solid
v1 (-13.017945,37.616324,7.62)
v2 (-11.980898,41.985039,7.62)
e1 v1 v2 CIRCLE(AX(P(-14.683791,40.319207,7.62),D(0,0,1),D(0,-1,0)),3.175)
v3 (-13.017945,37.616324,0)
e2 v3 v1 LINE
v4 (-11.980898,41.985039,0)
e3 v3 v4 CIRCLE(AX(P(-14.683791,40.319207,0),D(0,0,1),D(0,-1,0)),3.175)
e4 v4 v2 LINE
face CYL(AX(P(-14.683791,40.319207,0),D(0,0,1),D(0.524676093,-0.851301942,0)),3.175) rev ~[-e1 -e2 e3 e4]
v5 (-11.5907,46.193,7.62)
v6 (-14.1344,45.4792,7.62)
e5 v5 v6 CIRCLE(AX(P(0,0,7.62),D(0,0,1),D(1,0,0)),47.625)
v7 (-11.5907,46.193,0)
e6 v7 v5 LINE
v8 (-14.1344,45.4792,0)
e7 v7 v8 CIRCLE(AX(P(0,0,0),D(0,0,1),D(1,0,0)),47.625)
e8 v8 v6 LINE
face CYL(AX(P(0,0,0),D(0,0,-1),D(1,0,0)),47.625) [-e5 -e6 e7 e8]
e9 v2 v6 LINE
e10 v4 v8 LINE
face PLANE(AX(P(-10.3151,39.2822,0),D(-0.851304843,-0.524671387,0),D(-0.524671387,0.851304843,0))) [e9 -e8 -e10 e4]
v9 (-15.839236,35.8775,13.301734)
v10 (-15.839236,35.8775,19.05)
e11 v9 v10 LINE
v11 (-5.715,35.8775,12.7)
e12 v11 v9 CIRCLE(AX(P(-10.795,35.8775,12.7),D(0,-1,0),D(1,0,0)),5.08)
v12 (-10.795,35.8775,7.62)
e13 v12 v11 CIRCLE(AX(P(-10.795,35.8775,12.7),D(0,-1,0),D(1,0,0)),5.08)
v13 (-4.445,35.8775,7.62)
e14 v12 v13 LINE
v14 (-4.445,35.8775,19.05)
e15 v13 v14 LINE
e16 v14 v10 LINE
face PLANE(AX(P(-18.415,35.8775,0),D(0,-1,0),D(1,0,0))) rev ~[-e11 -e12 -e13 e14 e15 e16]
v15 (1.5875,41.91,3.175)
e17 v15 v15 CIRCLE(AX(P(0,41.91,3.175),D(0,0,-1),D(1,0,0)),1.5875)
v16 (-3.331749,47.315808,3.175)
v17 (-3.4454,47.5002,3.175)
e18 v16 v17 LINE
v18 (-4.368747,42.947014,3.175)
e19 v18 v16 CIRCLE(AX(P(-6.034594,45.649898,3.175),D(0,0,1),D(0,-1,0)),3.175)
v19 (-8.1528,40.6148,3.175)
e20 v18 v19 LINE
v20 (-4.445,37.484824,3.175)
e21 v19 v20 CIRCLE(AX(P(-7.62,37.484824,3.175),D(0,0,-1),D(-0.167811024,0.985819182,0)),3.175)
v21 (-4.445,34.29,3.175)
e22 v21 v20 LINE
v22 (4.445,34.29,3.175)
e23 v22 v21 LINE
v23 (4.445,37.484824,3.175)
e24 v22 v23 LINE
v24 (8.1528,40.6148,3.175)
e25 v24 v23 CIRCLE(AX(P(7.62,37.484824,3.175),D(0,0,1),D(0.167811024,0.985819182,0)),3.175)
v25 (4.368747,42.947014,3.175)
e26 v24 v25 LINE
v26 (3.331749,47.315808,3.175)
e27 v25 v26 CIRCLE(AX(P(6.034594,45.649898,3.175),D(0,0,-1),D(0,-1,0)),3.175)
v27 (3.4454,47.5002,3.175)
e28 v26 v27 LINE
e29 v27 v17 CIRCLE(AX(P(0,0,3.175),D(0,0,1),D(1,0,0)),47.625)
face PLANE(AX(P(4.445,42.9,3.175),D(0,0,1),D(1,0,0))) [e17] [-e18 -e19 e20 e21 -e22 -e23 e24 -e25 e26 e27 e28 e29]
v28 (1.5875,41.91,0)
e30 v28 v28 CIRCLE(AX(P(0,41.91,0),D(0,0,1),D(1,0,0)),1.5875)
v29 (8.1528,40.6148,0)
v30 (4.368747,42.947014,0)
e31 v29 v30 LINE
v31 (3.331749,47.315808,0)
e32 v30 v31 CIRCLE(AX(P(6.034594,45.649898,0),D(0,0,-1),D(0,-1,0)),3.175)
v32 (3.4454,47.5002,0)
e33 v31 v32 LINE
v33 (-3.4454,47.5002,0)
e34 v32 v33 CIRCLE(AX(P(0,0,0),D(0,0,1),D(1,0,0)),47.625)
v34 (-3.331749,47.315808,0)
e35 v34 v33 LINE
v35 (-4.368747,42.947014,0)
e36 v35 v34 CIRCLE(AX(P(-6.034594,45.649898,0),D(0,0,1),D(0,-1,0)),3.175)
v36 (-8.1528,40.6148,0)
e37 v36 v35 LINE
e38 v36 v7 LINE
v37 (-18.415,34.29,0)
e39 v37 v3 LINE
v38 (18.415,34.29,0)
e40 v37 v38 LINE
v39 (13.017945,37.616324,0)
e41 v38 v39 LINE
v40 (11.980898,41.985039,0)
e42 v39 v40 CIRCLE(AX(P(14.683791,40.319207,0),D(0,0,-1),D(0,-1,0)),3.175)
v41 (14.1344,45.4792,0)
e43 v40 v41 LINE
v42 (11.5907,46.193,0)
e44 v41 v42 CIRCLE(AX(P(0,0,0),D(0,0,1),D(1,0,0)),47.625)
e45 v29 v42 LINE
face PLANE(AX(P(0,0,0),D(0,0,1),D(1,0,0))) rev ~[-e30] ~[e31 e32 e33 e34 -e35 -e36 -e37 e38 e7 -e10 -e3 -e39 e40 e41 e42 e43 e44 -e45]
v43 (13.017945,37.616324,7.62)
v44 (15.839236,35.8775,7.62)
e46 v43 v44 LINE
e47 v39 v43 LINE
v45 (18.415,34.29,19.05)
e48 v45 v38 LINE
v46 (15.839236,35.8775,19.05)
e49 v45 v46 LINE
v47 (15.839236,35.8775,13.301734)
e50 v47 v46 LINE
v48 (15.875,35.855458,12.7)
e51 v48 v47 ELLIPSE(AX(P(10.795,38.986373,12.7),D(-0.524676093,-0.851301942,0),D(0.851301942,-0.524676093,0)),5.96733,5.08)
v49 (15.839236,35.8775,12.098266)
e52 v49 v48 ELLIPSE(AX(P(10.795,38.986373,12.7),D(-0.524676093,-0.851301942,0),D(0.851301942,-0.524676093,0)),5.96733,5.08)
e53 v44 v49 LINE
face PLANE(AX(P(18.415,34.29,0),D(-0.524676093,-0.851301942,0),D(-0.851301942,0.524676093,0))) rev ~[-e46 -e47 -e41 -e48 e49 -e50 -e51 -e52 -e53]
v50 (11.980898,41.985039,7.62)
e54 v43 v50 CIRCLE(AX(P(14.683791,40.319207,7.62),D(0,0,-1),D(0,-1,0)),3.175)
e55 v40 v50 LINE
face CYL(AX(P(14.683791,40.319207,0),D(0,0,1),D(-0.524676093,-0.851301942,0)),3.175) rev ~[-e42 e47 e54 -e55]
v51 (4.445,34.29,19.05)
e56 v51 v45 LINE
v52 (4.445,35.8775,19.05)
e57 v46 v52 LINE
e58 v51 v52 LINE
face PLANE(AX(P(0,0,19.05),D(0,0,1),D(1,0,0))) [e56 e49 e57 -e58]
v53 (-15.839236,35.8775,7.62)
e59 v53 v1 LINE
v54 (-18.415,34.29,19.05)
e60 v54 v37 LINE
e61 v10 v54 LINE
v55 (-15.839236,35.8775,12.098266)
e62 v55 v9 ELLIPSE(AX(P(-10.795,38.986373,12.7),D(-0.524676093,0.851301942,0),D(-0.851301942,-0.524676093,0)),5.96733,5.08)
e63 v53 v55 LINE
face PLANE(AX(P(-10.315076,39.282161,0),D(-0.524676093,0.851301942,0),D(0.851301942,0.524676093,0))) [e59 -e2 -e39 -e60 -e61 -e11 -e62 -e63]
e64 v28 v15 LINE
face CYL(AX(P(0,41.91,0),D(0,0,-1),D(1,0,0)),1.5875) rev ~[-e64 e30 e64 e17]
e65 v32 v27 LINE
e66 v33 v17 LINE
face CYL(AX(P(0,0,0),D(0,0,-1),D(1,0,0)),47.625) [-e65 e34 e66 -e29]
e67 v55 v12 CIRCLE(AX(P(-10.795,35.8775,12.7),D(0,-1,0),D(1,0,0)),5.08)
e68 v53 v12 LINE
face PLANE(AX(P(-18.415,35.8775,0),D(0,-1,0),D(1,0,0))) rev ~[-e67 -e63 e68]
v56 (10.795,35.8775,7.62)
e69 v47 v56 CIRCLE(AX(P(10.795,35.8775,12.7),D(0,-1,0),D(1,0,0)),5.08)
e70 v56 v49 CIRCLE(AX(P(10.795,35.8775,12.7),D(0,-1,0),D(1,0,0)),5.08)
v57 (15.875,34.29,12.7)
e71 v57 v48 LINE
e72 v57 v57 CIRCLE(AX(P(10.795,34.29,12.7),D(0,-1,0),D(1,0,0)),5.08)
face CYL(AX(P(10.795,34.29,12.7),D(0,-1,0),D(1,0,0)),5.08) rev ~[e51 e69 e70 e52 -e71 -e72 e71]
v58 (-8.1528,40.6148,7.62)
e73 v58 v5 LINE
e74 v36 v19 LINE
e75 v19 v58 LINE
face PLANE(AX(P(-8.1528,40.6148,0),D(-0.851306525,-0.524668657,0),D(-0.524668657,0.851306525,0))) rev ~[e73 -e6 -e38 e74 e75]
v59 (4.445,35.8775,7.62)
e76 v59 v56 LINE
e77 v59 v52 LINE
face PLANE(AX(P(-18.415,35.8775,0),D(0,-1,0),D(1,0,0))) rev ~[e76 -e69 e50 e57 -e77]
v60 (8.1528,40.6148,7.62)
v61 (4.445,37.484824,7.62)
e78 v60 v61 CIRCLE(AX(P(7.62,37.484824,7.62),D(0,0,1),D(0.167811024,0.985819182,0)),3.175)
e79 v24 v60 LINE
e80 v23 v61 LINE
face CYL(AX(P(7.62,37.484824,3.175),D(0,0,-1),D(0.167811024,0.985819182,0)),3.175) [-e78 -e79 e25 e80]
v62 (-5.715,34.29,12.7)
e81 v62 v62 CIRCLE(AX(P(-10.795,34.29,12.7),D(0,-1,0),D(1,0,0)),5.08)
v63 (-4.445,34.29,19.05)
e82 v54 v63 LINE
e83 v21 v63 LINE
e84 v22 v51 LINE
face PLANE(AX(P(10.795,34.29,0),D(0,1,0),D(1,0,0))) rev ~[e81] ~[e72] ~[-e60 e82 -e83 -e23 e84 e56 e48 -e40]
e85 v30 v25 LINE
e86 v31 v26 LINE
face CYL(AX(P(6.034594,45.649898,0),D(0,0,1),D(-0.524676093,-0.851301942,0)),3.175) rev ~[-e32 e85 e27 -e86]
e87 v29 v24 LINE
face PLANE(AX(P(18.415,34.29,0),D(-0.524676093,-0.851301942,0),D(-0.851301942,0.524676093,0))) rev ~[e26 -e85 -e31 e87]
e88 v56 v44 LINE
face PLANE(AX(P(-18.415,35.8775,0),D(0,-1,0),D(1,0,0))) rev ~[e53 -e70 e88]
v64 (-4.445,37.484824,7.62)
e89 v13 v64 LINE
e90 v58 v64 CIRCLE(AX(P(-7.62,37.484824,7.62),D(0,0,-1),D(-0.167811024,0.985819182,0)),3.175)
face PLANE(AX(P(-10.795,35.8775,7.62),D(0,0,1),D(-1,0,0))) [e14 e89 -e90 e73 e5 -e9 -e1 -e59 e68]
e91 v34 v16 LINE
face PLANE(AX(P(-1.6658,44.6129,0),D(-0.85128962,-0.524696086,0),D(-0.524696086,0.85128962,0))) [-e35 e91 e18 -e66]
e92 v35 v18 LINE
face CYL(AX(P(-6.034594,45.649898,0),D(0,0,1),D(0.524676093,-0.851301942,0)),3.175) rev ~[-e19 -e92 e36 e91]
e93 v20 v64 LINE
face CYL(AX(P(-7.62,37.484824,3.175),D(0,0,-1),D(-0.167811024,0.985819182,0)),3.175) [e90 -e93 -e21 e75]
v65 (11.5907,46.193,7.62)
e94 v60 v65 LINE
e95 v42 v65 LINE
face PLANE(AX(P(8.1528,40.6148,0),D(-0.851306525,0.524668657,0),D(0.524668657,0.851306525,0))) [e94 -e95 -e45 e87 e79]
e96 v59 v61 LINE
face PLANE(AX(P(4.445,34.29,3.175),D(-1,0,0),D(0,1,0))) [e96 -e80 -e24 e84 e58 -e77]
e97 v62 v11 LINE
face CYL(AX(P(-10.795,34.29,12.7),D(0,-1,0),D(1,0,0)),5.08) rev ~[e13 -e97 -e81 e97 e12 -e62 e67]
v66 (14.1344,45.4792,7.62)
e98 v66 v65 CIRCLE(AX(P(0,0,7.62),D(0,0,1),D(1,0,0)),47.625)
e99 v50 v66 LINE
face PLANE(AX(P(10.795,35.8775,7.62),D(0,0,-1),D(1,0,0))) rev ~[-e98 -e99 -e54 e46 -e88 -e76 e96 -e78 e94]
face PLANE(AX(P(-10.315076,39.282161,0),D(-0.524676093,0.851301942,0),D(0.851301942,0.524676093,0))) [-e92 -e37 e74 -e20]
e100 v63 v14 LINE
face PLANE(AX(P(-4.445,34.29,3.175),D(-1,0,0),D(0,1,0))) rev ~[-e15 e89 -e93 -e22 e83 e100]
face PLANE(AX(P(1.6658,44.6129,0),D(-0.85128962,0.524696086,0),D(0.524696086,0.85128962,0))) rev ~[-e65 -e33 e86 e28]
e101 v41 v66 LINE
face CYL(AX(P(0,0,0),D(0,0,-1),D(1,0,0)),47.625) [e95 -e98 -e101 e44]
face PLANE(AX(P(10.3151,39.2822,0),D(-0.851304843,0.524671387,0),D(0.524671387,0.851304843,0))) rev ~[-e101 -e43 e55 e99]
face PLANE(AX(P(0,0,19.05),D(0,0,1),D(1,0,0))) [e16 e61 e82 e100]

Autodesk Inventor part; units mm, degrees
ref_plane "YZ Plane" through (0, 0, 0) normal (1, 0, 0) x (0, 1, 0)
ref_plane "XZ Plane" through (0, 0, 0) normal (0, 1, 0) x (-1, 0, 0)
sketch "Sketch1" plane through (0, 0, 0) normal (0, 0, 1) x (1, 0, 0)
  circle A0 centre (0, 0) radius 47.625
  line L0 (0, 0) -> (0, 41.91)
  circle A1 centre (0, 41.91) radius 1.5875
  line L1 (-10.795, 34.29) -> (10.795, 34.29)
  circle A2 centre (0, 41.91) radius 3.175
  line L2 (-10.795, 34.29) -> (-18.415, 34.29)
  line L3 (10.795, 34.29) -> (18.415, 34.29)
  line L4 (18.415, 34.29) -> (1.6658, 44.6129)
  line L5 (-18.415, 34.29) -> (-1.6658, 44.6129)
  line L6 (-1.6658, 44.6129) -> (-3.4454, 47.5002)
  line L7 (1.6658, 44.6129) -> (3.4454, 47.5002)
  line L8 (8.1528, 40.6148) -> (11.5907, 46.193)
  line L9 (10.3151, 39.2822) -> (14.1344, 45.4792)
  line L10 (-8.1528, 40.6148) -> (-11.5907, 46.193)
  line L11 (-10.3151, 39.2822) -> (-14.1344, 45.4792)
  dimension "d0" = 95.25
  dimension "d1" = 41.91
  dimension "d2" = 3.175
  dimension "d3" = 21.59
  dimension "d4" = 7.62
  dimension "d5" = 10.795
  dimension "d6" = 6.35
  dimension "d7" = 7.62
  dimension "d8" = 7.62
  dimension "d27" = 7.62
  dimension "d28" = 2.54
  dimension "d29" = 7.62
  dimension "d30" = 2.54
extrude "Extrusion1" add sketch "Sketch1" along normal blind 3.175 contours L4 L3 L1 L0 A2 | L5 A2 L0 L1 L2 | L7 A2 L6 A0 | A2
sketch "Sketch2" plane through (0, 0, 3.175) normal (0, 0, 1) x (1, 0, 0)
  circle A0 centre (0, 41.91) radius 1.5875 projected
  line L0 (-1.6658, 44.6129) -> (-18.415, 34.29) projected
  line L1 (-18.415, 34.29) -> (18.415, 34.29) projected
  line L2 (18.415, 34.29) -> (1.6658, 44.6129) projected
  line L3 (1.6658, 44.6129) -> (3.4454, 47.5002) projected
  arc A1 (3.4454, 47.5002) -> (-3.4454, 47.5002) centre (0, 0) ccw projected
  line L4 (-3.4454, 47.5002) -> (-1.6658, 44.6129) projected
  line L5 (-4.445, 34.29) -> (-4.445, 42.9)
  line L6 (-18.415, 34.29) -> (18.415, 34.29) projected
  line L7 (4.445, 34.29) -> (4.445, 42.9)
  dimension "d11" = 13.97
extrude "Extrusion2" add sketch "Sketch2" along normal blind 15.875 contours L5 L1 L0 | L7 L2 L1
sketch "Sketch3" plane through (-18.415, 34.29, 0) normal (0, -1, 0) x (1, 0, 0)
  line L0 (0, 0) -> (36.83, 0) projected
  line L1 (36.83, 0) -> (36.83, 19.05) projected
  line L2 (22.86, 19.05) -> (36.83, 19.05) projected
  line L3 (22.86, 3.175) -> (22.86, 19.05) projected
  line L4 (13.97, 3.175) -> (22.86, 3.175) projected
  line L5 (13.97, 3.175) -> (13.97, 19.05) projected
  line L6 (0, 19.05) -> (13.97, 19.05) projected
  line L7 (0, 0) -> (0, 19.05) projected
  circle A0 centre (7.62, 12.7) radius 5.08
  circle A1 centre (29.21, 12.7) radius 5.08
  point P0 (18.415, 0)
  dimension "d14" = 10.16
  dimension "d15" = 10.16
  dimension "d16" = 6.35
  dimension "d17" = 6.35
  dimension "d18" = 6.35
  dimension "d19" = 6.35
extrude "Extrusion3" cut sketch "Sketch3" against normal blind 12.7 contours A0 | A1
ref_plane "Work Plane1" through (-18.415, 35.8775, 0) normal (0, -1, 0) x (1, 0, 0)
sketch "Sketch4" plane through (-18.415, 35.8775, 0) normal (0, -1, 0) x (1, 0, 0)
  circle A0 centre (29.21, 12.7) radius 5.08 projected
  line L0 (36.83, 0) -> (20.0808, 0) projected
  line L1 (20.0808, 0) -> (20.0808, 3.175) projected
  line L2 (22.86, 3.175) -> (20.0808, 3.175) projected
  line L3 (22.86, 3.175) -> (22.86, 19.05) projected
  line L4 (36.83, 19.05) -> (22.86, 19.05) projected
  line L5 (36.83, 0) -> (36.83, 19.05) projected
  circle A1 centre (7.62, 12.7) radius 5.08 projected
  line L6 (16.7492, 0) -> (0, 0) projected
  line L7 (0, 0) -> (0, 19.05) projected
  line L8 (13.97, 19.05) -> (0, 19.05) projected
  line L9 (13.97, 3.175) -> (13.97, 19.05) projected
  line L10 (16.7492, 3.175) -> (13.97, 3.175) projected
  line L11 (16.7492, 0) -> (16.7492, 3.175) projected
  line L12 (36.83, 19.05) -> (22.86, 19.05) projected
  line L13 (36.83, 19.05) -> (22.86, 19.05)
  line L14 (22.86, 19.05) -> (22.86, 7.62)
  line L15 (22.86, 7.62) -> (36.83, 7.62)
  line L16 (36.83, 7.62) -> (36.83, 19.05)
  line L17 (0, 19.05) -> (13.97, 19.05)
  line L18 (13.97, 19.05) -> (13.97, 7.62)
  line L19 (13.97, 7.62) -> (0, 7.62)
  line L20 (0, 7.62) -> (0, 19.05)
  circle A2 centre (29.21, 12.7) radius 5.08 projected
  circle A3 centre (7.62, 12.7) radius 5.08 projected
  point P0 (18.415, 0)
extrude "Extrusion4" cut sketch "Sketch4" against normal blind 12.7 contours A0 | L15 L3 L4 L5 | A1 | L19 L7 L8 L9
fillet "Fillet1" radius 3.175 2 edges at (1.6658, 44.6129, 1.5875) (-1.6658, 44.6129, 1.5875)
extrude "Extrusion5" add sketch "Sketch1" along normal up to surface (7.62 mm away) contours L9 L4 L8 A0 | A0 L10 L5 L11
fillet "Fillet3" radius 3.175 2 edges at (-10.3151, 39.2822, 3.81) (10.3151, 39.2822, 3.81)
fillet "Fillet4" radius 3.175 2 edges at (-4.445, 42.9, 5.3975) (4.445, 42.9, 5.3975)
equation "\"d5\" = 0.5 * d3"
properties part number "aftPotentiometerMount" material "ABS Plastic"
